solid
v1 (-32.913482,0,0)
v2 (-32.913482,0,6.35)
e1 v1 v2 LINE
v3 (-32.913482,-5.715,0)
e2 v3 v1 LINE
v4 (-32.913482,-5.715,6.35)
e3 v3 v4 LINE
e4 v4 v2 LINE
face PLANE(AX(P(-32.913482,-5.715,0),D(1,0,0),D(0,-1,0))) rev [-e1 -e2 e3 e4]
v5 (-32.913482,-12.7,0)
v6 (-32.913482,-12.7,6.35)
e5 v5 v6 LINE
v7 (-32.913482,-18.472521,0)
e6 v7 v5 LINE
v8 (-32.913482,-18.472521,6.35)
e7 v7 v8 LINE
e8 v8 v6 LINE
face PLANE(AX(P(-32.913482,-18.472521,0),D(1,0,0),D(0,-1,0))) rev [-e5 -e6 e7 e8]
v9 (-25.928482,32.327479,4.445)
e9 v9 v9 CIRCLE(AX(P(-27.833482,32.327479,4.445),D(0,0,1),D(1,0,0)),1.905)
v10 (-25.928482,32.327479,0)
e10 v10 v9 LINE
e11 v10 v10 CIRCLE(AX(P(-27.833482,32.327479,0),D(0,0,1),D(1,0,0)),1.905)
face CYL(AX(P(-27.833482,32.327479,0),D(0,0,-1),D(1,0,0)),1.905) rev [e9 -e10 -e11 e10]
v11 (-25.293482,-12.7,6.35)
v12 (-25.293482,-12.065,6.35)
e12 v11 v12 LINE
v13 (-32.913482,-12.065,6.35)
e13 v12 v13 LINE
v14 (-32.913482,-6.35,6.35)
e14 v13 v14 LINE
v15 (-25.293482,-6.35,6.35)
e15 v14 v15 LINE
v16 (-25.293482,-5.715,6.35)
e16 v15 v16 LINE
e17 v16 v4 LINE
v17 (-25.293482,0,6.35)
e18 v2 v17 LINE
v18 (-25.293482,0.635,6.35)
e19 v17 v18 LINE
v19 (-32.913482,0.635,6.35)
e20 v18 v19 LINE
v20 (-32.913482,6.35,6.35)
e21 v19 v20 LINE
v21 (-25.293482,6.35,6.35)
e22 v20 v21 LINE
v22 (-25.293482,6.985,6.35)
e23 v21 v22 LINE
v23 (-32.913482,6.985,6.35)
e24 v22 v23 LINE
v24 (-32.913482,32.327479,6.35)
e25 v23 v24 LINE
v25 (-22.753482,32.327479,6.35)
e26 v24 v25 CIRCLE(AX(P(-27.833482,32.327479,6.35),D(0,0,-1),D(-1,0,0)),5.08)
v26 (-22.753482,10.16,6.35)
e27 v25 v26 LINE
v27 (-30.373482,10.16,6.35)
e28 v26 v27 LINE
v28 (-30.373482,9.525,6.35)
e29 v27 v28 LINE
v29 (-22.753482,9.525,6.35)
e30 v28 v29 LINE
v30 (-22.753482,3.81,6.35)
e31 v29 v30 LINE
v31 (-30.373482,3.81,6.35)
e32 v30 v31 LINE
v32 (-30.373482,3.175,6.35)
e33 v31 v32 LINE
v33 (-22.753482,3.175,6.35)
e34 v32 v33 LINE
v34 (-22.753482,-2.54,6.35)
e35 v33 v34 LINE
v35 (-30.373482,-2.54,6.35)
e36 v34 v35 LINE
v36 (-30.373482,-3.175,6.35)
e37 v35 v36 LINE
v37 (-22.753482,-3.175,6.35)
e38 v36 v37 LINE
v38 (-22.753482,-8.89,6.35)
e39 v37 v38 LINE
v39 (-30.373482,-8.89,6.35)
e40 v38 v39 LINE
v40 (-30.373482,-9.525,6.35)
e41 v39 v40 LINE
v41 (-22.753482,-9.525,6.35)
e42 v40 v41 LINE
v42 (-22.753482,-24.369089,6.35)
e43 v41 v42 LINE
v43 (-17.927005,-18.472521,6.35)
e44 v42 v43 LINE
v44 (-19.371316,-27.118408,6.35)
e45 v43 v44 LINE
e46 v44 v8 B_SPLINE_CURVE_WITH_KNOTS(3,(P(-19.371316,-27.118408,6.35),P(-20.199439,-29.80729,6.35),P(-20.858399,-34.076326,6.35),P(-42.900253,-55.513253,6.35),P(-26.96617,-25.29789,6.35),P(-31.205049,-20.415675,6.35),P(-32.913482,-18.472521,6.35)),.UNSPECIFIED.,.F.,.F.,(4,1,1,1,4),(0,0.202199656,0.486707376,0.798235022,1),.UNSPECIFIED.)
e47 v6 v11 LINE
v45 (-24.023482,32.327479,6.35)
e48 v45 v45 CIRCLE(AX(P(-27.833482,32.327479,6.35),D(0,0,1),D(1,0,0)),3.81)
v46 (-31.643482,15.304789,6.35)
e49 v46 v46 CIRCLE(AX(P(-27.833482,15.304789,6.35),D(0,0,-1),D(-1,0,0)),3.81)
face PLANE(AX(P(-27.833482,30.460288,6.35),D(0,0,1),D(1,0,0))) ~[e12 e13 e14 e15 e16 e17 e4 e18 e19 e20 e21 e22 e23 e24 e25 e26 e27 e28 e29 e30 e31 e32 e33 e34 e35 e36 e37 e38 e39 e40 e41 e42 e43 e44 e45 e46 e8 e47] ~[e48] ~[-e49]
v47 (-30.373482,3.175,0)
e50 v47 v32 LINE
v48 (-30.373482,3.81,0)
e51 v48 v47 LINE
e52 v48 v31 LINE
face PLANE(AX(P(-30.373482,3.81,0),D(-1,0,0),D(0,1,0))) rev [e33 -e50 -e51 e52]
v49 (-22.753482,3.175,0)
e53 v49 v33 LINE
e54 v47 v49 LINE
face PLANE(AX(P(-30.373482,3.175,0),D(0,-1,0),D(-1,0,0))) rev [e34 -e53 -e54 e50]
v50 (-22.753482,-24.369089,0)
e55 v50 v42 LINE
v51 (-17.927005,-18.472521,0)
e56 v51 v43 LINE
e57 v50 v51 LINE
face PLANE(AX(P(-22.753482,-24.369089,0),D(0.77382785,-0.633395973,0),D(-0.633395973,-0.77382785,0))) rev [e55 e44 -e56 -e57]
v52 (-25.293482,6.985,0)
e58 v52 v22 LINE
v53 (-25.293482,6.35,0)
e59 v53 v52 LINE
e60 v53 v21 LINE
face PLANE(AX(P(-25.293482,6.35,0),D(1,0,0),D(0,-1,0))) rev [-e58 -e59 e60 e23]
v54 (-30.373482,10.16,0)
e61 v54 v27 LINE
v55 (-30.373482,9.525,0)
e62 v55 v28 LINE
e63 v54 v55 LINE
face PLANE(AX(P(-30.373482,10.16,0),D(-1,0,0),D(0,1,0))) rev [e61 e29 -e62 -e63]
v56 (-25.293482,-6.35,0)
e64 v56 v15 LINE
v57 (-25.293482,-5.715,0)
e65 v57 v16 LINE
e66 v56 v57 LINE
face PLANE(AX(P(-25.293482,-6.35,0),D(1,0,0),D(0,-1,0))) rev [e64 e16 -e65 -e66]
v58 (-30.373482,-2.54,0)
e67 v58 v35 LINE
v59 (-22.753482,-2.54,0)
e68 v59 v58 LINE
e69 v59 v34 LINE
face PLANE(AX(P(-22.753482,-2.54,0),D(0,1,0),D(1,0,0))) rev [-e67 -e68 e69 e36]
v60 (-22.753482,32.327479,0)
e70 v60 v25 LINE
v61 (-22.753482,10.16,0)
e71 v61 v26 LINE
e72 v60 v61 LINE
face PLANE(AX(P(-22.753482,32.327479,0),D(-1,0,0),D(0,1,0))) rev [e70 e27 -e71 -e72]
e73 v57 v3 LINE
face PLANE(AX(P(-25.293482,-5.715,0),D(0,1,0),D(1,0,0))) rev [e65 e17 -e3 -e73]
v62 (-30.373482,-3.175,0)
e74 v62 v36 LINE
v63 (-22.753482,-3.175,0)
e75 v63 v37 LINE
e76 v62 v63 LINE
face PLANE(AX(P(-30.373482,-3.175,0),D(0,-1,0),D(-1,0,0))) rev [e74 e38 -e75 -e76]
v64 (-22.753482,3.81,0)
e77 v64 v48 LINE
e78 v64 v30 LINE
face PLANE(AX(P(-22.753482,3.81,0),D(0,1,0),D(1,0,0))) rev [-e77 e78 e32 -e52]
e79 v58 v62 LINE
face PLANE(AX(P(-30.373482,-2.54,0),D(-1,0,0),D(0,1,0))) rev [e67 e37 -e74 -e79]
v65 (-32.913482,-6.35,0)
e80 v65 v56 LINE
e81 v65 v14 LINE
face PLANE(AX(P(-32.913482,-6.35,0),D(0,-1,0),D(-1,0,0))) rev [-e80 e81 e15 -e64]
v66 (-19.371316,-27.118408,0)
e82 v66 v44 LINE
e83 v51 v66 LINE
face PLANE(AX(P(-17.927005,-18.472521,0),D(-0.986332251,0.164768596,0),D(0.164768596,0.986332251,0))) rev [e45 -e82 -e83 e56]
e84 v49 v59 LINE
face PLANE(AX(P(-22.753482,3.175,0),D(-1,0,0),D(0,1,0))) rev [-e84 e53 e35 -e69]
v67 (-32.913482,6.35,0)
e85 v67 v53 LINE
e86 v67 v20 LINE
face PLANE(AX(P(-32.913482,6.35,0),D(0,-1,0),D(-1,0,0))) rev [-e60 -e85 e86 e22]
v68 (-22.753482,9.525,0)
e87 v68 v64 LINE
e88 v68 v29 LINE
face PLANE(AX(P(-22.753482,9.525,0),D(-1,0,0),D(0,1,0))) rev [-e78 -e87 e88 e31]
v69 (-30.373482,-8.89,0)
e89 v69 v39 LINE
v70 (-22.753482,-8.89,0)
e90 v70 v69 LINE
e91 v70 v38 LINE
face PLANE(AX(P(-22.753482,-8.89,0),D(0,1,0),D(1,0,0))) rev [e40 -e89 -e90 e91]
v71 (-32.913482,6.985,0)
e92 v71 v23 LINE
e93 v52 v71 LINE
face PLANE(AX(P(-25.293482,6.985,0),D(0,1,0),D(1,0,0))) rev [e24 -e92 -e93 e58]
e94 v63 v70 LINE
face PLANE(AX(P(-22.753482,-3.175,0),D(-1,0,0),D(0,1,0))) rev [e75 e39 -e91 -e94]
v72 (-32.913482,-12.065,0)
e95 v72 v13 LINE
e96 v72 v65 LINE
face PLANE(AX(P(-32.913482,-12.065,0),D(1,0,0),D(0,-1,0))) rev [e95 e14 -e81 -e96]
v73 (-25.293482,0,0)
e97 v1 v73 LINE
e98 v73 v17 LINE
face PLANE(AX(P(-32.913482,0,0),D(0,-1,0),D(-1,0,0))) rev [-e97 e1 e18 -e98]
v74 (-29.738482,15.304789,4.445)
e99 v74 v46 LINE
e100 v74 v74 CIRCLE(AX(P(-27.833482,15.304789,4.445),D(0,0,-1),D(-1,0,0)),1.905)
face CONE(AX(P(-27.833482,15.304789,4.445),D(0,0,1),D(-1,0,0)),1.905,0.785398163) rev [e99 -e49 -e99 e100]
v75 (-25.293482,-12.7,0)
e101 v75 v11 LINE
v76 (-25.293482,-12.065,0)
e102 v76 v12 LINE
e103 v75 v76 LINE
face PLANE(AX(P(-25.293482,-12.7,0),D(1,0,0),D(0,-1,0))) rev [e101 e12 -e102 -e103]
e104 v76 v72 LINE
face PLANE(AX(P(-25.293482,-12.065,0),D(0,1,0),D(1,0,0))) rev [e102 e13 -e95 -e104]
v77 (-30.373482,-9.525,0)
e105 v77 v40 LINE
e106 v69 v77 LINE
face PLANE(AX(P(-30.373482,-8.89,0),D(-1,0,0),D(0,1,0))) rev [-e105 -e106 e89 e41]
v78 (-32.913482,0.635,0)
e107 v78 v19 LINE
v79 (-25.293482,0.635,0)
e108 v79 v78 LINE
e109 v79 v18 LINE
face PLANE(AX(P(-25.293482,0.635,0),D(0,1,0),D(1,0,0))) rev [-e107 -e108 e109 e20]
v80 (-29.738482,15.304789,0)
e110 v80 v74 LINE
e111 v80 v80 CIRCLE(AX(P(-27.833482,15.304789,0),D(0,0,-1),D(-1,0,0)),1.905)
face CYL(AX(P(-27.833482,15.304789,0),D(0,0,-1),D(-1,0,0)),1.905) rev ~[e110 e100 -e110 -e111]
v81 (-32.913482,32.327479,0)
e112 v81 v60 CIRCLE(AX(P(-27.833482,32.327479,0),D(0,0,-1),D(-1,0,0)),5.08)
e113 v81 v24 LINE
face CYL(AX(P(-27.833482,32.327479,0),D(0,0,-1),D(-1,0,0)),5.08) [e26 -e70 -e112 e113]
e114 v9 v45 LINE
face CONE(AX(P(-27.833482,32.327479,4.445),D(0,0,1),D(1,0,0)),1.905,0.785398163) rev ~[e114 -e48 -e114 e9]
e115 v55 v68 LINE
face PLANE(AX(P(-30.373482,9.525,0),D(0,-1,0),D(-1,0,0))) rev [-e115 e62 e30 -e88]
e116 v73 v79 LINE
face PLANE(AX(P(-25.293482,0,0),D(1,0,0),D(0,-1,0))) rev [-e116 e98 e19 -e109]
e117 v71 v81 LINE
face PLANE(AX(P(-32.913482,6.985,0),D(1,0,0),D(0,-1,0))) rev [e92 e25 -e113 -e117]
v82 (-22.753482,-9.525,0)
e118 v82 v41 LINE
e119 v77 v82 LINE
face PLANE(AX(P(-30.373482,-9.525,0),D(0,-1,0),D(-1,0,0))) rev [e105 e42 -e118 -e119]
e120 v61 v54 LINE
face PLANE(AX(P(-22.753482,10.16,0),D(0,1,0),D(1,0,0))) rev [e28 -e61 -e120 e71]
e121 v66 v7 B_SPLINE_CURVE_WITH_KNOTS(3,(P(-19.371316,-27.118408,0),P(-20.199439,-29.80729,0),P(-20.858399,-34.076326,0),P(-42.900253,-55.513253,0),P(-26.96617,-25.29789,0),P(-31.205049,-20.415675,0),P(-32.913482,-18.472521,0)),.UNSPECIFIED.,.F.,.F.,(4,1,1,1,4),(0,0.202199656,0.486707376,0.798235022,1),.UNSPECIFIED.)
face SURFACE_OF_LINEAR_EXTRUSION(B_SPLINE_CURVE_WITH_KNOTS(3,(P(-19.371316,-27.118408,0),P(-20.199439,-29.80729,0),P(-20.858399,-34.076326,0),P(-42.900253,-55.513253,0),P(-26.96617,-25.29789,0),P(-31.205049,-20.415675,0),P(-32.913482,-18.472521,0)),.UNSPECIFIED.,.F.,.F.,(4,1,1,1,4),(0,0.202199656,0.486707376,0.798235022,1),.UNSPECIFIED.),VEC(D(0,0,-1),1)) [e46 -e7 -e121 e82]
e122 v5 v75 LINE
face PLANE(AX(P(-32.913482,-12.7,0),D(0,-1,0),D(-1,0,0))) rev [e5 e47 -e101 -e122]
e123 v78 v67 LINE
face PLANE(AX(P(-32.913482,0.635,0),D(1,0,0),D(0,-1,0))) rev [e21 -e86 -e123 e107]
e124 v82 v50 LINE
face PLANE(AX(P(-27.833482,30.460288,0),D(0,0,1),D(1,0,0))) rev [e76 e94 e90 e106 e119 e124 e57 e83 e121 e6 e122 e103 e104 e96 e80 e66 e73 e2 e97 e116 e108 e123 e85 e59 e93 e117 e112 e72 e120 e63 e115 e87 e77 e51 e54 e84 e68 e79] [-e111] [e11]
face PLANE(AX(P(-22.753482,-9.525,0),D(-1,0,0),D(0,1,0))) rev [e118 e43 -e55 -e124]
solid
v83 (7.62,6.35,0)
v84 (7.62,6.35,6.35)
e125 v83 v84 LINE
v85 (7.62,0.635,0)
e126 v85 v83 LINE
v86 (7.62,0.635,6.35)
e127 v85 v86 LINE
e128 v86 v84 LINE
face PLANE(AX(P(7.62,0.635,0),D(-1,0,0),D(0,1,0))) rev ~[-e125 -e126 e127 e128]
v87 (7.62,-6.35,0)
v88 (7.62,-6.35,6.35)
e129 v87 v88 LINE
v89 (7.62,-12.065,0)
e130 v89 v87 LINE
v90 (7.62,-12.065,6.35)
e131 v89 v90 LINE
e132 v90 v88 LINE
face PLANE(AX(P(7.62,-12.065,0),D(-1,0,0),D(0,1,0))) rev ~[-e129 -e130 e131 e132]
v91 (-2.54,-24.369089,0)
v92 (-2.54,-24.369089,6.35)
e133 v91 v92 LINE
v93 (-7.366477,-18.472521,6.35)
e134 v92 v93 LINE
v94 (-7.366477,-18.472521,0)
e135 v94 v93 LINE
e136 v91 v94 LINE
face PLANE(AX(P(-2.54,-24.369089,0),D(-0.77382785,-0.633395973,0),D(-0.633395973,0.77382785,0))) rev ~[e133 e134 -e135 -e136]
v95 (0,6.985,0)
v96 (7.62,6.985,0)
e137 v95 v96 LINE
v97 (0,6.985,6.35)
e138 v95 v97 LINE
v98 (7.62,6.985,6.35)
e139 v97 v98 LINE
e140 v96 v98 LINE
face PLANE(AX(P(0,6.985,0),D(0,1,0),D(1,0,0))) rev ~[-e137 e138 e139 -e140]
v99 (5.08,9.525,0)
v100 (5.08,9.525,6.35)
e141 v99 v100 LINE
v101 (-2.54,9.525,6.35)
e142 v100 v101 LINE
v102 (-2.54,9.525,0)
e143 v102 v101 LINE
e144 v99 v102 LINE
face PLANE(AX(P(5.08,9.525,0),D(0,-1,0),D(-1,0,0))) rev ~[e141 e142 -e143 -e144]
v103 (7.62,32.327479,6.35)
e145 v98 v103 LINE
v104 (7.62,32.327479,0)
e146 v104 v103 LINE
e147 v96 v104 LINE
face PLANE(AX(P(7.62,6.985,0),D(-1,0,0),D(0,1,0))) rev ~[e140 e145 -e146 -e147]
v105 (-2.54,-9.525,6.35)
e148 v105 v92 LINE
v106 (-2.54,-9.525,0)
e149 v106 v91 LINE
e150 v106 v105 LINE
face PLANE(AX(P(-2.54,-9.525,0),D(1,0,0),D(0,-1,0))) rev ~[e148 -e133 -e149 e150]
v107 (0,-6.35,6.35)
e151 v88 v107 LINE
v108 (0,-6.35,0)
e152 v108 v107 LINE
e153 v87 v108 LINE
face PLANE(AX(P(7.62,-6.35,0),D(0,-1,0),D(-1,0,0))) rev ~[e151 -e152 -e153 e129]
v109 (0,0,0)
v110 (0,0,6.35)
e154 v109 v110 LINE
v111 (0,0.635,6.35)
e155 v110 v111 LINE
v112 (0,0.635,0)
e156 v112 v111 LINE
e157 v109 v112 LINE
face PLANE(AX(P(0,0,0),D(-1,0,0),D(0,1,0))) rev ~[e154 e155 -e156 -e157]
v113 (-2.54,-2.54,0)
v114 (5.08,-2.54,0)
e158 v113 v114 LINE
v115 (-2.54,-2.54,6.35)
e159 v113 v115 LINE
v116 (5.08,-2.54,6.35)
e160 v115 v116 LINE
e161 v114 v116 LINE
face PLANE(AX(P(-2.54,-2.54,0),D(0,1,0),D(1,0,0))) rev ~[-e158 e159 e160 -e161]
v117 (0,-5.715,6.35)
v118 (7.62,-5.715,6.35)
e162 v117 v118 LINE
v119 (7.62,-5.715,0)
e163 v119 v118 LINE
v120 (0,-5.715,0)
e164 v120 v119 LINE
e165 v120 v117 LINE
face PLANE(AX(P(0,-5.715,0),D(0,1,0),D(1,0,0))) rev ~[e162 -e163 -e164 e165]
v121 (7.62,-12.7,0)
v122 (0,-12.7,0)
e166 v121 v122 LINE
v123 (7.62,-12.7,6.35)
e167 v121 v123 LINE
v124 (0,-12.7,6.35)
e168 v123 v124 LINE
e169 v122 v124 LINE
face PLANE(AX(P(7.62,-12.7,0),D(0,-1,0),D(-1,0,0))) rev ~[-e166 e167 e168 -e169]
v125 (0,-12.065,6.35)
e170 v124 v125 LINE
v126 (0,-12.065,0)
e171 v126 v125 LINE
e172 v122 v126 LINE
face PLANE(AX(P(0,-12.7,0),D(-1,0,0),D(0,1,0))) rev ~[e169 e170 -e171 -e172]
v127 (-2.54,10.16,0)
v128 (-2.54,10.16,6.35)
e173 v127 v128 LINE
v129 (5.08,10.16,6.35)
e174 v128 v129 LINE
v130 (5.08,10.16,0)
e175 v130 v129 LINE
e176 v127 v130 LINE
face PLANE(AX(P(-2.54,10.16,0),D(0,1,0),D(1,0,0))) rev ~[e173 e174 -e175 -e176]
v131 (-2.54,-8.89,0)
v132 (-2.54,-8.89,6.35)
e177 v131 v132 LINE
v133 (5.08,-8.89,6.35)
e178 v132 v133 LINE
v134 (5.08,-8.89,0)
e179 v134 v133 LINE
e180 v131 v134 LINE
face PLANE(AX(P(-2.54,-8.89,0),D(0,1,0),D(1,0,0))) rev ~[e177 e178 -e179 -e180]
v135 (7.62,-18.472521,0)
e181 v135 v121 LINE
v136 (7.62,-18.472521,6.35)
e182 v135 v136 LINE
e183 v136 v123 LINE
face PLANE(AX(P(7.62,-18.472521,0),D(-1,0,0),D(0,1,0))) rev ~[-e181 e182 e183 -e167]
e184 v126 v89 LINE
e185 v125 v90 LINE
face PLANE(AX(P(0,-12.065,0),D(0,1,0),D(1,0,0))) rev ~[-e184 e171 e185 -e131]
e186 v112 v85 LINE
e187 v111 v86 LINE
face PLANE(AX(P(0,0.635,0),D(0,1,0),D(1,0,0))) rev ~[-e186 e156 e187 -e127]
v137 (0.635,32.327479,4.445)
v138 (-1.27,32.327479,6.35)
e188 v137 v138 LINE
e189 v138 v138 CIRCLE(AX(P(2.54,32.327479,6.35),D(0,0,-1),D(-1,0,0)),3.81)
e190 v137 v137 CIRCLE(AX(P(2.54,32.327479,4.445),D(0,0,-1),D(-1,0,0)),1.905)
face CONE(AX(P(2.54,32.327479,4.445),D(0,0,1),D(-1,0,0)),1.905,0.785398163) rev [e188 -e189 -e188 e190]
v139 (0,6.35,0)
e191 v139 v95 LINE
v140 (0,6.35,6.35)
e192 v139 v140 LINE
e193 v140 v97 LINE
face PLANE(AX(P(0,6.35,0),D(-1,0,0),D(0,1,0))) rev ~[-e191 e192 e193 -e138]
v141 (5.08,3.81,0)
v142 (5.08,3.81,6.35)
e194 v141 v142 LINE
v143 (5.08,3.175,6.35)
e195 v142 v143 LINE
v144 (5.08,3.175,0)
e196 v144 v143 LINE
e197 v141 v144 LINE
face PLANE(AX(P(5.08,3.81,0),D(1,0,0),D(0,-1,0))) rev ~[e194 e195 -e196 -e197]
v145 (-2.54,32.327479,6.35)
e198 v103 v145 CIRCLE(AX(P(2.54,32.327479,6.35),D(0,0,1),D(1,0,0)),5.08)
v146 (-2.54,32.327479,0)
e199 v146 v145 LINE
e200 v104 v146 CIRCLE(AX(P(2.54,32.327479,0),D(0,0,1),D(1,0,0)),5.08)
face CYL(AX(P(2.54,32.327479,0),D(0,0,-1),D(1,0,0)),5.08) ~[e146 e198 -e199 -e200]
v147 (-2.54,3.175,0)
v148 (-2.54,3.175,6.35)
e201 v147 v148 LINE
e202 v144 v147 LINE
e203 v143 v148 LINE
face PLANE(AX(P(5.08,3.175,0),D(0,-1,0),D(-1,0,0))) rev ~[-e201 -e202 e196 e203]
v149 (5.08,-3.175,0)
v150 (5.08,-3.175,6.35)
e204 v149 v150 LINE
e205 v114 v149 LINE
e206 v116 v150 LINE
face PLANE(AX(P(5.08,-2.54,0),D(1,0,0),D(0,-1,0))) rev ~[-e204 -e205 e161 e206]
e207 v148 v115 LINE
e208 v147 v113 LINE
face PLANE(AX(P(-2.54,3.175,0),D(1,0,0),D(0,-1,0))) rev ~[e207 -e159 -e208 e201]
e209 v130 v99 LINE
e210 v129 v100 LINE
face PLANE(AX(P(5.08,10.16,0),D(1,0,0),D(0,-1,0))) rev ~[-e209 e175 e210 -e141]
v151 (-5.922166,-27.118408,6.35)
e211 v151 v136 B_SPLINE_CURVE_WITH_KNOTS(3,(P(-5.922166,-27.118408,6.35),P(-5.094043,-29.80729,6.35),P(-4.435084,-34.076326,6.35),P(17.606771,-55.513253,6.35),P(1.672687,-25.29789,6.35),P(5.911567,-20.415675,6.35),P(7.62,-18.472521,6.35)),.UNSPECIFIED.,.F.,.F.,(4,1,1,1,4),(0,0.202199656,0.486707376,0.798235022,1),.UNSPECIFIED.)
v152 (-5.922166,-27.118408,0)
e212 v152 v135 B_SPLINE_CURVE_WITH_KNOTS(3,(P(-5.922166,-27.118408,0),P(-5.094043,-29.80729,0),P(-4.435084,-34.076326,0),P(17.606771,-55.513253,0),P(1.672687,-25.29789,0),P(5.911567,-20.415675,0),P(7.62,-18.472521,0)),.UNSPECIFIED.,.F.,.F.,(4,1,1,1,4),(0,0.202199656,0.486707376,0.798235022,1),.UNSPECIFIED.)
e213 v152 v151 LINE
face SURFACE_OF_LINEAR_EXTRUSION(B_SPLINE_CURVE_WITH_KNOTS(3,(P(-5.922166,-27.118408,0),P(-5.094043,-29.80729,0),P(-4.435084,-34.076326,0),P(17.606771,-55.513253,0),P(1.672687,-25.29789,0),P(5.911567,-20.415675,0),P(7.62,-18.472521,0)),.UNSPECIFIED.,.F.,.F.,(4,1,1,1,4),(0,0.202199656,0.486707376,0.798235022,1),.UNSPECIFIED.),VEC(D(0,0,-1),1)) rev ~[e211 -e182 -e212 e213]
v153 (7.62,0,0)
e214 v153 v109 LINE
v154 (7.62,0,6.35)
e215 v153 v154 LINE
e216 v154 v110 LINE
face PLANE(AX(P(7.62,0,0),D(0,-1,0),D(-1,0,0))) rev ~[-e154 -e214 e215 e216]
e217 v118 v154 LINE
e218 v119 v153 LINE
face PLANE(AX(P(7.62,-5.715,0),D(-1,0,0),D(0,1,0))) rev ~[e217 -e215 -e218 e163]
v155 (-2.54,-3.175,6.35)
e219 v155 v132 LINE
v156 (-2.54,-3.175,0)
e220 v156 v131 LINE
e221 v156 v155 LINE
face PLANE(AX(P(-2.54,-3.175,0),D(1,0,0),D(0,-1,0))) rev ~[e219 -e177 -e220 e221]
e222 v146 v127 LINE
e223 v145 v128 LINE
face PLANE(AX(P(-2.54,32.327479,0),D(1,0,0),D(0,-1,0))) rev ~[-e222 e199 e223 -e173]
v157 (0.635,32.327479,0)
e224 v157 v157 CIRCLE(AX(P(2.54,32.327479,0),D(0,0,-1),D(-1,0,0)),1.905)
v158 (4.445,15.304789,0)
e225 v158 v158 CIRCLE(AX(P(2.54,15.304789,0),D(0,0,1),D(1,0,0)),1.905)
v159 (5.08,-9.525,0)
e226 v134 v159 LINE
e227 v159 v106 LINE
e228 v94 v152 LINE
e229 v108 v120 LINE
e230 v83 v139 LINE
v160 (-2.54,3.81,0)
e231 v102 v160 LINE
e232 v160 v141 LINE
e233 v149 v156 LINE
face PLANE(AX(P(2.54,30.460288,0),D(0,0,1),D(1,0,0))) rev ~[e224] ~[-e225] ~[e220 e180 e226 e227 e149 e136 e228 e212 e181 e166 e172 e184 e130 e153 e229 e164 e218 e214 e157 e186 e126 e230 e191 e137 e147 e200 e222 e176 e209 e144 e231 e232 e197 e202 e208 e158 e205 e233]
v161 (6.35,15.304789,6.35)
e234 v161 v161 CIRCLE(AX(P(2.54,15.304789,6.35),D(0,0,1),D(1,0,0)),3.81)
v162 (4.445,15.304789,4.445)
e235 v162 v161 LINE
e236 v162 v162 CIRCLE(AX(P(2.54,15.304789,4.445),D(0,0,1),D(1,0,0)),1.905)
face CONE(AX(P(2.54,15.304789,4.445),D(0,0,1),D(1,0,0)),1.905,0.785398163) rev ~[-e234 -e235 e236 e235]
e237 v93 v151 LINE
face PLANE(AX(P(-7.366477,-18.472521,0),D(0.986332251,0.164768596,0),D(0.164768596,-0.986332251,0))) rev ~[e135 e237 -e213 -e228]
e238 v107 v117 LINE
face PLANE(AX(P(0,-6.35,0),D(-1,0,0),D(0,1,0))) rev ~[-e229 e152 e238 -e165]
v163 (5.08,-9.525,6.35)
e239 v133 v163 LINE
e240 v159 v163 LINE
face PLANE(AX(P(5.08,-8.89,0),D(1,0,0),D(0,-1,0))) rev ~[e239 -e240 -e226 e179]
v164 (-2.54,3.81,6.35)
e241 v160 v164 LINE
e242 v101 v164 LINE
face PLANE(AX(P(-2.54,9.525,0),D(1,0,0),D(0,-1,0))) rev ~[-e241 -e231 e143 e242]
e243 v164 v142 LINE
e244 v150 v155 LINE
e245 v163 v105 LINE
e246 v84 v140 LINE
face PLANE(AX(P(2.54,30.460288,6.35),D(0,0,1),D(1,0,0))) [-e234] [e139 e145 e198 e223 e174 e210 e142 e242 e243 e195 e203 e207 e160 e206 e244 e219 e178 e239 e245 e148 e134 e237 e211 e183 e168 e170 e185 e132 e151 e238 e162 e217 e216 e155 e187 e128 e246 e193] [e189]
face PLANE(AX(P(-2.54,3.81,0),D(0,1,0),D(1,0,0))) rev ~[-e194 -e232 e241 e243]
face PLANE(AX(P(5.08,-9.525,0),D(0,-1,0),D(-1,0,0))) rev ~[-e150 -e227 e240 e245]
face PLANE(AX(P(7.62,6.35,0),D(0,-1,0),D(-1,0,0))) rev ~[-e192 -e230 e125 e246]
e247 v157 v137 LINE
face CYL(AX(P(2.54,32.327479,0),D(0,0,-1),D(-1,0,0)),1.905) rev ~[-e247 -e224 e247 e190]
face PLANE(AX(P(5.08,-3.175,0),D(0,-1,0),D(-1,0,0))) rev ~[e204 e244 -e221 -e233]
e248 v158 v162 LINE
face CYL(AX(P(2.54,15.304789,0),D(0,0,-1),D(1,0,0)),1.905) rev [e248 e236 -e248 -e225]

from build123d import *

# Parameters (mm, degrees)
F0_R     = 1.905
F1_DEPTH = 6.35
F2_SIZE  = 1.905


# Not quite as in the source:
# - a feature names something its author has since deleted; it is built from what else it names


with BuildPart() as f1:
    # F0 (on Top) → F1 (new body)
    with BuildSketch(Plane.XY):
        with BuildLine():
            Line((0.635, 32.3274787827), (-2.54, 32.3274787827))
            ThreePointArc((-2.54, 32.3274787827), (2.54, 27.2474787827), (7.62, 32.3274787827))
            Line((7.62, 32.3274787827), (4.445, 32.3274787827))
            ThreePointArc((4.445, 32.3274787827), (2.54, 30.4224787827), (0.635, 32.3274787827))
        make_face()
        with BuildLine():
            ThreePointArc((7.62, 32.3274787827), (2.54, 37.4074787827), (-2.54, 32.3274787827))
            Line((-2.54, 32.3274787827), (0.635, 32.3274787827))
            ThreePointArc((0.635, 32.3274787827), (2.54, 34.2324787827), (4.445, 32.3274787827))
            Line((4.445, 32.3274787827), (7.62, 32.3274787827))
        make_face()
        with BuildLine():
            Line((-2.54, -9.525), (-2.54, -18.4725212173))
            Line((-2.54, -18.4725212173), (-2.54, -24.3690894357))
            Line((-2.54, -24.3690894357), (-7.3664773123, -18.4725212173))
            Line((-7.3664773123, -18.4725212173), (-5.9221661487, -27.1184083573))
            add(Edge.make_bspline(
                [(-5.9221661487, -27.1184083573), (-5.0940429792, -29.8072900623), (-4.4350836246, -34.076325633), (17.6067707768, -55.5132531587), (1.6726871659, -25.297889833), (5.911566797, -20.4156751081), (7.62, -18.4725212173)],
                knots=[0, 0, 0, 0, 0.2021996559, 0.4867073763, 0.7982350217, 1, 1, 1, 1], degree=3))
            Line((7.62, -18.4725212173), (7.62, -12.7))
            Line((7.62, -12.7), (0, -12.7))
            Line((0, -12.7), (0, -12.065))
            Line((0, -12.065), (7.62, -12.065))
            Line((7.62, -12.065), (7.62, -6.35))
            Line((7.62, -6.35), (0, -6.35))
            Line((0, -6.35), (0, -5.715))
            Line((0, -5.715), (7.62, -5.715))
            Line((7.62, -5.715), (7.62, 0))
            Line((7.62, 0), (0, 0))
            Line((0, 0), (0, 0.635))
            Line((0, 0.635), (7.62, 0.635))
            Line((7.62, 0.635), (7.62, 6.35))
            Line((7.62, 6.35), (0, 6.35))
            Line((0, 6.35), (0, 6.985))
            Line((0, 6.985), (5.9817770534, 6.985))
            Line((5.9817770534, 6.985), (7.62, 6.985))
            Line((7.62, 6.985), (7.62, 9.525))
            Line((7.62, 9.525), (7.62, 32.3274787827))
            ThreePointArc((7.62, 32.3274787827), (2.54, 27.2474787827), (-2.54, 32.3274787827))
            Line((-2.54, 32.3274787827), (-2.54, 19.6274787827))
            Line((-2.54, 19.6274787827), (-2.54, 10.16))
            Line((-2.54, 10.16), (5.08, 10.16))
            Line((5.08, 10.16), (5.08, 9.525))
            Line((5.08, 9.525), (-2.54, 9.525))
            Line((-2.54, 9.525), (-2.54, 3.81))
            Line((-2.54, 3.81), (5.08, 3.81))
            Line((5.08, 3.81), (5.08, 3.175))
            Line((5.08, 3.175), (-2.54, 3.175))
            Line((-2.54, 3.175), (-2.54, -2.54))
            Line((-2.54, -2.54), (5.08, -2.54))
            Line((5.08, -2.54), (5.08, -3.175))
            Line((5.08, -3.175), (-2.54, -3.175))
            Line((-2.54, -3.175), (-2.54, -8.89))
            Line((-2.54, -8.89), (5.08, -8.89))
            Line((5.08, -8.89), (5.08, -9.525))
            Line((5.08, -9.525), (-2.54, -9.525))
        make_face()
        with Locations((2.54, 15.3047889471)):
            Circle(F0_R, mode=Mode.SUBTRACT)
    extrude(amount=F1_DEPTH)

    # F2
    f2_edges = [f1.edges().sort_by_distance(p)[0] for p in [
        (0.635, 15.304789, 6.35),
        (4.445, 32.327479, 6.35),
    ]]
    chamfer(f2_edges, length=F2_SIZE)


with BuildPart() as f5_1:
    # F5: instance of F1
    add(f1.part.mirror(Plane(origin=(-12.6467412338, 13.2919847965, 12.7), x_dir=(0, 1, 0), z_dir=(1, 0, 0))))


solid = Compound([f1.part, f5_1.part])
